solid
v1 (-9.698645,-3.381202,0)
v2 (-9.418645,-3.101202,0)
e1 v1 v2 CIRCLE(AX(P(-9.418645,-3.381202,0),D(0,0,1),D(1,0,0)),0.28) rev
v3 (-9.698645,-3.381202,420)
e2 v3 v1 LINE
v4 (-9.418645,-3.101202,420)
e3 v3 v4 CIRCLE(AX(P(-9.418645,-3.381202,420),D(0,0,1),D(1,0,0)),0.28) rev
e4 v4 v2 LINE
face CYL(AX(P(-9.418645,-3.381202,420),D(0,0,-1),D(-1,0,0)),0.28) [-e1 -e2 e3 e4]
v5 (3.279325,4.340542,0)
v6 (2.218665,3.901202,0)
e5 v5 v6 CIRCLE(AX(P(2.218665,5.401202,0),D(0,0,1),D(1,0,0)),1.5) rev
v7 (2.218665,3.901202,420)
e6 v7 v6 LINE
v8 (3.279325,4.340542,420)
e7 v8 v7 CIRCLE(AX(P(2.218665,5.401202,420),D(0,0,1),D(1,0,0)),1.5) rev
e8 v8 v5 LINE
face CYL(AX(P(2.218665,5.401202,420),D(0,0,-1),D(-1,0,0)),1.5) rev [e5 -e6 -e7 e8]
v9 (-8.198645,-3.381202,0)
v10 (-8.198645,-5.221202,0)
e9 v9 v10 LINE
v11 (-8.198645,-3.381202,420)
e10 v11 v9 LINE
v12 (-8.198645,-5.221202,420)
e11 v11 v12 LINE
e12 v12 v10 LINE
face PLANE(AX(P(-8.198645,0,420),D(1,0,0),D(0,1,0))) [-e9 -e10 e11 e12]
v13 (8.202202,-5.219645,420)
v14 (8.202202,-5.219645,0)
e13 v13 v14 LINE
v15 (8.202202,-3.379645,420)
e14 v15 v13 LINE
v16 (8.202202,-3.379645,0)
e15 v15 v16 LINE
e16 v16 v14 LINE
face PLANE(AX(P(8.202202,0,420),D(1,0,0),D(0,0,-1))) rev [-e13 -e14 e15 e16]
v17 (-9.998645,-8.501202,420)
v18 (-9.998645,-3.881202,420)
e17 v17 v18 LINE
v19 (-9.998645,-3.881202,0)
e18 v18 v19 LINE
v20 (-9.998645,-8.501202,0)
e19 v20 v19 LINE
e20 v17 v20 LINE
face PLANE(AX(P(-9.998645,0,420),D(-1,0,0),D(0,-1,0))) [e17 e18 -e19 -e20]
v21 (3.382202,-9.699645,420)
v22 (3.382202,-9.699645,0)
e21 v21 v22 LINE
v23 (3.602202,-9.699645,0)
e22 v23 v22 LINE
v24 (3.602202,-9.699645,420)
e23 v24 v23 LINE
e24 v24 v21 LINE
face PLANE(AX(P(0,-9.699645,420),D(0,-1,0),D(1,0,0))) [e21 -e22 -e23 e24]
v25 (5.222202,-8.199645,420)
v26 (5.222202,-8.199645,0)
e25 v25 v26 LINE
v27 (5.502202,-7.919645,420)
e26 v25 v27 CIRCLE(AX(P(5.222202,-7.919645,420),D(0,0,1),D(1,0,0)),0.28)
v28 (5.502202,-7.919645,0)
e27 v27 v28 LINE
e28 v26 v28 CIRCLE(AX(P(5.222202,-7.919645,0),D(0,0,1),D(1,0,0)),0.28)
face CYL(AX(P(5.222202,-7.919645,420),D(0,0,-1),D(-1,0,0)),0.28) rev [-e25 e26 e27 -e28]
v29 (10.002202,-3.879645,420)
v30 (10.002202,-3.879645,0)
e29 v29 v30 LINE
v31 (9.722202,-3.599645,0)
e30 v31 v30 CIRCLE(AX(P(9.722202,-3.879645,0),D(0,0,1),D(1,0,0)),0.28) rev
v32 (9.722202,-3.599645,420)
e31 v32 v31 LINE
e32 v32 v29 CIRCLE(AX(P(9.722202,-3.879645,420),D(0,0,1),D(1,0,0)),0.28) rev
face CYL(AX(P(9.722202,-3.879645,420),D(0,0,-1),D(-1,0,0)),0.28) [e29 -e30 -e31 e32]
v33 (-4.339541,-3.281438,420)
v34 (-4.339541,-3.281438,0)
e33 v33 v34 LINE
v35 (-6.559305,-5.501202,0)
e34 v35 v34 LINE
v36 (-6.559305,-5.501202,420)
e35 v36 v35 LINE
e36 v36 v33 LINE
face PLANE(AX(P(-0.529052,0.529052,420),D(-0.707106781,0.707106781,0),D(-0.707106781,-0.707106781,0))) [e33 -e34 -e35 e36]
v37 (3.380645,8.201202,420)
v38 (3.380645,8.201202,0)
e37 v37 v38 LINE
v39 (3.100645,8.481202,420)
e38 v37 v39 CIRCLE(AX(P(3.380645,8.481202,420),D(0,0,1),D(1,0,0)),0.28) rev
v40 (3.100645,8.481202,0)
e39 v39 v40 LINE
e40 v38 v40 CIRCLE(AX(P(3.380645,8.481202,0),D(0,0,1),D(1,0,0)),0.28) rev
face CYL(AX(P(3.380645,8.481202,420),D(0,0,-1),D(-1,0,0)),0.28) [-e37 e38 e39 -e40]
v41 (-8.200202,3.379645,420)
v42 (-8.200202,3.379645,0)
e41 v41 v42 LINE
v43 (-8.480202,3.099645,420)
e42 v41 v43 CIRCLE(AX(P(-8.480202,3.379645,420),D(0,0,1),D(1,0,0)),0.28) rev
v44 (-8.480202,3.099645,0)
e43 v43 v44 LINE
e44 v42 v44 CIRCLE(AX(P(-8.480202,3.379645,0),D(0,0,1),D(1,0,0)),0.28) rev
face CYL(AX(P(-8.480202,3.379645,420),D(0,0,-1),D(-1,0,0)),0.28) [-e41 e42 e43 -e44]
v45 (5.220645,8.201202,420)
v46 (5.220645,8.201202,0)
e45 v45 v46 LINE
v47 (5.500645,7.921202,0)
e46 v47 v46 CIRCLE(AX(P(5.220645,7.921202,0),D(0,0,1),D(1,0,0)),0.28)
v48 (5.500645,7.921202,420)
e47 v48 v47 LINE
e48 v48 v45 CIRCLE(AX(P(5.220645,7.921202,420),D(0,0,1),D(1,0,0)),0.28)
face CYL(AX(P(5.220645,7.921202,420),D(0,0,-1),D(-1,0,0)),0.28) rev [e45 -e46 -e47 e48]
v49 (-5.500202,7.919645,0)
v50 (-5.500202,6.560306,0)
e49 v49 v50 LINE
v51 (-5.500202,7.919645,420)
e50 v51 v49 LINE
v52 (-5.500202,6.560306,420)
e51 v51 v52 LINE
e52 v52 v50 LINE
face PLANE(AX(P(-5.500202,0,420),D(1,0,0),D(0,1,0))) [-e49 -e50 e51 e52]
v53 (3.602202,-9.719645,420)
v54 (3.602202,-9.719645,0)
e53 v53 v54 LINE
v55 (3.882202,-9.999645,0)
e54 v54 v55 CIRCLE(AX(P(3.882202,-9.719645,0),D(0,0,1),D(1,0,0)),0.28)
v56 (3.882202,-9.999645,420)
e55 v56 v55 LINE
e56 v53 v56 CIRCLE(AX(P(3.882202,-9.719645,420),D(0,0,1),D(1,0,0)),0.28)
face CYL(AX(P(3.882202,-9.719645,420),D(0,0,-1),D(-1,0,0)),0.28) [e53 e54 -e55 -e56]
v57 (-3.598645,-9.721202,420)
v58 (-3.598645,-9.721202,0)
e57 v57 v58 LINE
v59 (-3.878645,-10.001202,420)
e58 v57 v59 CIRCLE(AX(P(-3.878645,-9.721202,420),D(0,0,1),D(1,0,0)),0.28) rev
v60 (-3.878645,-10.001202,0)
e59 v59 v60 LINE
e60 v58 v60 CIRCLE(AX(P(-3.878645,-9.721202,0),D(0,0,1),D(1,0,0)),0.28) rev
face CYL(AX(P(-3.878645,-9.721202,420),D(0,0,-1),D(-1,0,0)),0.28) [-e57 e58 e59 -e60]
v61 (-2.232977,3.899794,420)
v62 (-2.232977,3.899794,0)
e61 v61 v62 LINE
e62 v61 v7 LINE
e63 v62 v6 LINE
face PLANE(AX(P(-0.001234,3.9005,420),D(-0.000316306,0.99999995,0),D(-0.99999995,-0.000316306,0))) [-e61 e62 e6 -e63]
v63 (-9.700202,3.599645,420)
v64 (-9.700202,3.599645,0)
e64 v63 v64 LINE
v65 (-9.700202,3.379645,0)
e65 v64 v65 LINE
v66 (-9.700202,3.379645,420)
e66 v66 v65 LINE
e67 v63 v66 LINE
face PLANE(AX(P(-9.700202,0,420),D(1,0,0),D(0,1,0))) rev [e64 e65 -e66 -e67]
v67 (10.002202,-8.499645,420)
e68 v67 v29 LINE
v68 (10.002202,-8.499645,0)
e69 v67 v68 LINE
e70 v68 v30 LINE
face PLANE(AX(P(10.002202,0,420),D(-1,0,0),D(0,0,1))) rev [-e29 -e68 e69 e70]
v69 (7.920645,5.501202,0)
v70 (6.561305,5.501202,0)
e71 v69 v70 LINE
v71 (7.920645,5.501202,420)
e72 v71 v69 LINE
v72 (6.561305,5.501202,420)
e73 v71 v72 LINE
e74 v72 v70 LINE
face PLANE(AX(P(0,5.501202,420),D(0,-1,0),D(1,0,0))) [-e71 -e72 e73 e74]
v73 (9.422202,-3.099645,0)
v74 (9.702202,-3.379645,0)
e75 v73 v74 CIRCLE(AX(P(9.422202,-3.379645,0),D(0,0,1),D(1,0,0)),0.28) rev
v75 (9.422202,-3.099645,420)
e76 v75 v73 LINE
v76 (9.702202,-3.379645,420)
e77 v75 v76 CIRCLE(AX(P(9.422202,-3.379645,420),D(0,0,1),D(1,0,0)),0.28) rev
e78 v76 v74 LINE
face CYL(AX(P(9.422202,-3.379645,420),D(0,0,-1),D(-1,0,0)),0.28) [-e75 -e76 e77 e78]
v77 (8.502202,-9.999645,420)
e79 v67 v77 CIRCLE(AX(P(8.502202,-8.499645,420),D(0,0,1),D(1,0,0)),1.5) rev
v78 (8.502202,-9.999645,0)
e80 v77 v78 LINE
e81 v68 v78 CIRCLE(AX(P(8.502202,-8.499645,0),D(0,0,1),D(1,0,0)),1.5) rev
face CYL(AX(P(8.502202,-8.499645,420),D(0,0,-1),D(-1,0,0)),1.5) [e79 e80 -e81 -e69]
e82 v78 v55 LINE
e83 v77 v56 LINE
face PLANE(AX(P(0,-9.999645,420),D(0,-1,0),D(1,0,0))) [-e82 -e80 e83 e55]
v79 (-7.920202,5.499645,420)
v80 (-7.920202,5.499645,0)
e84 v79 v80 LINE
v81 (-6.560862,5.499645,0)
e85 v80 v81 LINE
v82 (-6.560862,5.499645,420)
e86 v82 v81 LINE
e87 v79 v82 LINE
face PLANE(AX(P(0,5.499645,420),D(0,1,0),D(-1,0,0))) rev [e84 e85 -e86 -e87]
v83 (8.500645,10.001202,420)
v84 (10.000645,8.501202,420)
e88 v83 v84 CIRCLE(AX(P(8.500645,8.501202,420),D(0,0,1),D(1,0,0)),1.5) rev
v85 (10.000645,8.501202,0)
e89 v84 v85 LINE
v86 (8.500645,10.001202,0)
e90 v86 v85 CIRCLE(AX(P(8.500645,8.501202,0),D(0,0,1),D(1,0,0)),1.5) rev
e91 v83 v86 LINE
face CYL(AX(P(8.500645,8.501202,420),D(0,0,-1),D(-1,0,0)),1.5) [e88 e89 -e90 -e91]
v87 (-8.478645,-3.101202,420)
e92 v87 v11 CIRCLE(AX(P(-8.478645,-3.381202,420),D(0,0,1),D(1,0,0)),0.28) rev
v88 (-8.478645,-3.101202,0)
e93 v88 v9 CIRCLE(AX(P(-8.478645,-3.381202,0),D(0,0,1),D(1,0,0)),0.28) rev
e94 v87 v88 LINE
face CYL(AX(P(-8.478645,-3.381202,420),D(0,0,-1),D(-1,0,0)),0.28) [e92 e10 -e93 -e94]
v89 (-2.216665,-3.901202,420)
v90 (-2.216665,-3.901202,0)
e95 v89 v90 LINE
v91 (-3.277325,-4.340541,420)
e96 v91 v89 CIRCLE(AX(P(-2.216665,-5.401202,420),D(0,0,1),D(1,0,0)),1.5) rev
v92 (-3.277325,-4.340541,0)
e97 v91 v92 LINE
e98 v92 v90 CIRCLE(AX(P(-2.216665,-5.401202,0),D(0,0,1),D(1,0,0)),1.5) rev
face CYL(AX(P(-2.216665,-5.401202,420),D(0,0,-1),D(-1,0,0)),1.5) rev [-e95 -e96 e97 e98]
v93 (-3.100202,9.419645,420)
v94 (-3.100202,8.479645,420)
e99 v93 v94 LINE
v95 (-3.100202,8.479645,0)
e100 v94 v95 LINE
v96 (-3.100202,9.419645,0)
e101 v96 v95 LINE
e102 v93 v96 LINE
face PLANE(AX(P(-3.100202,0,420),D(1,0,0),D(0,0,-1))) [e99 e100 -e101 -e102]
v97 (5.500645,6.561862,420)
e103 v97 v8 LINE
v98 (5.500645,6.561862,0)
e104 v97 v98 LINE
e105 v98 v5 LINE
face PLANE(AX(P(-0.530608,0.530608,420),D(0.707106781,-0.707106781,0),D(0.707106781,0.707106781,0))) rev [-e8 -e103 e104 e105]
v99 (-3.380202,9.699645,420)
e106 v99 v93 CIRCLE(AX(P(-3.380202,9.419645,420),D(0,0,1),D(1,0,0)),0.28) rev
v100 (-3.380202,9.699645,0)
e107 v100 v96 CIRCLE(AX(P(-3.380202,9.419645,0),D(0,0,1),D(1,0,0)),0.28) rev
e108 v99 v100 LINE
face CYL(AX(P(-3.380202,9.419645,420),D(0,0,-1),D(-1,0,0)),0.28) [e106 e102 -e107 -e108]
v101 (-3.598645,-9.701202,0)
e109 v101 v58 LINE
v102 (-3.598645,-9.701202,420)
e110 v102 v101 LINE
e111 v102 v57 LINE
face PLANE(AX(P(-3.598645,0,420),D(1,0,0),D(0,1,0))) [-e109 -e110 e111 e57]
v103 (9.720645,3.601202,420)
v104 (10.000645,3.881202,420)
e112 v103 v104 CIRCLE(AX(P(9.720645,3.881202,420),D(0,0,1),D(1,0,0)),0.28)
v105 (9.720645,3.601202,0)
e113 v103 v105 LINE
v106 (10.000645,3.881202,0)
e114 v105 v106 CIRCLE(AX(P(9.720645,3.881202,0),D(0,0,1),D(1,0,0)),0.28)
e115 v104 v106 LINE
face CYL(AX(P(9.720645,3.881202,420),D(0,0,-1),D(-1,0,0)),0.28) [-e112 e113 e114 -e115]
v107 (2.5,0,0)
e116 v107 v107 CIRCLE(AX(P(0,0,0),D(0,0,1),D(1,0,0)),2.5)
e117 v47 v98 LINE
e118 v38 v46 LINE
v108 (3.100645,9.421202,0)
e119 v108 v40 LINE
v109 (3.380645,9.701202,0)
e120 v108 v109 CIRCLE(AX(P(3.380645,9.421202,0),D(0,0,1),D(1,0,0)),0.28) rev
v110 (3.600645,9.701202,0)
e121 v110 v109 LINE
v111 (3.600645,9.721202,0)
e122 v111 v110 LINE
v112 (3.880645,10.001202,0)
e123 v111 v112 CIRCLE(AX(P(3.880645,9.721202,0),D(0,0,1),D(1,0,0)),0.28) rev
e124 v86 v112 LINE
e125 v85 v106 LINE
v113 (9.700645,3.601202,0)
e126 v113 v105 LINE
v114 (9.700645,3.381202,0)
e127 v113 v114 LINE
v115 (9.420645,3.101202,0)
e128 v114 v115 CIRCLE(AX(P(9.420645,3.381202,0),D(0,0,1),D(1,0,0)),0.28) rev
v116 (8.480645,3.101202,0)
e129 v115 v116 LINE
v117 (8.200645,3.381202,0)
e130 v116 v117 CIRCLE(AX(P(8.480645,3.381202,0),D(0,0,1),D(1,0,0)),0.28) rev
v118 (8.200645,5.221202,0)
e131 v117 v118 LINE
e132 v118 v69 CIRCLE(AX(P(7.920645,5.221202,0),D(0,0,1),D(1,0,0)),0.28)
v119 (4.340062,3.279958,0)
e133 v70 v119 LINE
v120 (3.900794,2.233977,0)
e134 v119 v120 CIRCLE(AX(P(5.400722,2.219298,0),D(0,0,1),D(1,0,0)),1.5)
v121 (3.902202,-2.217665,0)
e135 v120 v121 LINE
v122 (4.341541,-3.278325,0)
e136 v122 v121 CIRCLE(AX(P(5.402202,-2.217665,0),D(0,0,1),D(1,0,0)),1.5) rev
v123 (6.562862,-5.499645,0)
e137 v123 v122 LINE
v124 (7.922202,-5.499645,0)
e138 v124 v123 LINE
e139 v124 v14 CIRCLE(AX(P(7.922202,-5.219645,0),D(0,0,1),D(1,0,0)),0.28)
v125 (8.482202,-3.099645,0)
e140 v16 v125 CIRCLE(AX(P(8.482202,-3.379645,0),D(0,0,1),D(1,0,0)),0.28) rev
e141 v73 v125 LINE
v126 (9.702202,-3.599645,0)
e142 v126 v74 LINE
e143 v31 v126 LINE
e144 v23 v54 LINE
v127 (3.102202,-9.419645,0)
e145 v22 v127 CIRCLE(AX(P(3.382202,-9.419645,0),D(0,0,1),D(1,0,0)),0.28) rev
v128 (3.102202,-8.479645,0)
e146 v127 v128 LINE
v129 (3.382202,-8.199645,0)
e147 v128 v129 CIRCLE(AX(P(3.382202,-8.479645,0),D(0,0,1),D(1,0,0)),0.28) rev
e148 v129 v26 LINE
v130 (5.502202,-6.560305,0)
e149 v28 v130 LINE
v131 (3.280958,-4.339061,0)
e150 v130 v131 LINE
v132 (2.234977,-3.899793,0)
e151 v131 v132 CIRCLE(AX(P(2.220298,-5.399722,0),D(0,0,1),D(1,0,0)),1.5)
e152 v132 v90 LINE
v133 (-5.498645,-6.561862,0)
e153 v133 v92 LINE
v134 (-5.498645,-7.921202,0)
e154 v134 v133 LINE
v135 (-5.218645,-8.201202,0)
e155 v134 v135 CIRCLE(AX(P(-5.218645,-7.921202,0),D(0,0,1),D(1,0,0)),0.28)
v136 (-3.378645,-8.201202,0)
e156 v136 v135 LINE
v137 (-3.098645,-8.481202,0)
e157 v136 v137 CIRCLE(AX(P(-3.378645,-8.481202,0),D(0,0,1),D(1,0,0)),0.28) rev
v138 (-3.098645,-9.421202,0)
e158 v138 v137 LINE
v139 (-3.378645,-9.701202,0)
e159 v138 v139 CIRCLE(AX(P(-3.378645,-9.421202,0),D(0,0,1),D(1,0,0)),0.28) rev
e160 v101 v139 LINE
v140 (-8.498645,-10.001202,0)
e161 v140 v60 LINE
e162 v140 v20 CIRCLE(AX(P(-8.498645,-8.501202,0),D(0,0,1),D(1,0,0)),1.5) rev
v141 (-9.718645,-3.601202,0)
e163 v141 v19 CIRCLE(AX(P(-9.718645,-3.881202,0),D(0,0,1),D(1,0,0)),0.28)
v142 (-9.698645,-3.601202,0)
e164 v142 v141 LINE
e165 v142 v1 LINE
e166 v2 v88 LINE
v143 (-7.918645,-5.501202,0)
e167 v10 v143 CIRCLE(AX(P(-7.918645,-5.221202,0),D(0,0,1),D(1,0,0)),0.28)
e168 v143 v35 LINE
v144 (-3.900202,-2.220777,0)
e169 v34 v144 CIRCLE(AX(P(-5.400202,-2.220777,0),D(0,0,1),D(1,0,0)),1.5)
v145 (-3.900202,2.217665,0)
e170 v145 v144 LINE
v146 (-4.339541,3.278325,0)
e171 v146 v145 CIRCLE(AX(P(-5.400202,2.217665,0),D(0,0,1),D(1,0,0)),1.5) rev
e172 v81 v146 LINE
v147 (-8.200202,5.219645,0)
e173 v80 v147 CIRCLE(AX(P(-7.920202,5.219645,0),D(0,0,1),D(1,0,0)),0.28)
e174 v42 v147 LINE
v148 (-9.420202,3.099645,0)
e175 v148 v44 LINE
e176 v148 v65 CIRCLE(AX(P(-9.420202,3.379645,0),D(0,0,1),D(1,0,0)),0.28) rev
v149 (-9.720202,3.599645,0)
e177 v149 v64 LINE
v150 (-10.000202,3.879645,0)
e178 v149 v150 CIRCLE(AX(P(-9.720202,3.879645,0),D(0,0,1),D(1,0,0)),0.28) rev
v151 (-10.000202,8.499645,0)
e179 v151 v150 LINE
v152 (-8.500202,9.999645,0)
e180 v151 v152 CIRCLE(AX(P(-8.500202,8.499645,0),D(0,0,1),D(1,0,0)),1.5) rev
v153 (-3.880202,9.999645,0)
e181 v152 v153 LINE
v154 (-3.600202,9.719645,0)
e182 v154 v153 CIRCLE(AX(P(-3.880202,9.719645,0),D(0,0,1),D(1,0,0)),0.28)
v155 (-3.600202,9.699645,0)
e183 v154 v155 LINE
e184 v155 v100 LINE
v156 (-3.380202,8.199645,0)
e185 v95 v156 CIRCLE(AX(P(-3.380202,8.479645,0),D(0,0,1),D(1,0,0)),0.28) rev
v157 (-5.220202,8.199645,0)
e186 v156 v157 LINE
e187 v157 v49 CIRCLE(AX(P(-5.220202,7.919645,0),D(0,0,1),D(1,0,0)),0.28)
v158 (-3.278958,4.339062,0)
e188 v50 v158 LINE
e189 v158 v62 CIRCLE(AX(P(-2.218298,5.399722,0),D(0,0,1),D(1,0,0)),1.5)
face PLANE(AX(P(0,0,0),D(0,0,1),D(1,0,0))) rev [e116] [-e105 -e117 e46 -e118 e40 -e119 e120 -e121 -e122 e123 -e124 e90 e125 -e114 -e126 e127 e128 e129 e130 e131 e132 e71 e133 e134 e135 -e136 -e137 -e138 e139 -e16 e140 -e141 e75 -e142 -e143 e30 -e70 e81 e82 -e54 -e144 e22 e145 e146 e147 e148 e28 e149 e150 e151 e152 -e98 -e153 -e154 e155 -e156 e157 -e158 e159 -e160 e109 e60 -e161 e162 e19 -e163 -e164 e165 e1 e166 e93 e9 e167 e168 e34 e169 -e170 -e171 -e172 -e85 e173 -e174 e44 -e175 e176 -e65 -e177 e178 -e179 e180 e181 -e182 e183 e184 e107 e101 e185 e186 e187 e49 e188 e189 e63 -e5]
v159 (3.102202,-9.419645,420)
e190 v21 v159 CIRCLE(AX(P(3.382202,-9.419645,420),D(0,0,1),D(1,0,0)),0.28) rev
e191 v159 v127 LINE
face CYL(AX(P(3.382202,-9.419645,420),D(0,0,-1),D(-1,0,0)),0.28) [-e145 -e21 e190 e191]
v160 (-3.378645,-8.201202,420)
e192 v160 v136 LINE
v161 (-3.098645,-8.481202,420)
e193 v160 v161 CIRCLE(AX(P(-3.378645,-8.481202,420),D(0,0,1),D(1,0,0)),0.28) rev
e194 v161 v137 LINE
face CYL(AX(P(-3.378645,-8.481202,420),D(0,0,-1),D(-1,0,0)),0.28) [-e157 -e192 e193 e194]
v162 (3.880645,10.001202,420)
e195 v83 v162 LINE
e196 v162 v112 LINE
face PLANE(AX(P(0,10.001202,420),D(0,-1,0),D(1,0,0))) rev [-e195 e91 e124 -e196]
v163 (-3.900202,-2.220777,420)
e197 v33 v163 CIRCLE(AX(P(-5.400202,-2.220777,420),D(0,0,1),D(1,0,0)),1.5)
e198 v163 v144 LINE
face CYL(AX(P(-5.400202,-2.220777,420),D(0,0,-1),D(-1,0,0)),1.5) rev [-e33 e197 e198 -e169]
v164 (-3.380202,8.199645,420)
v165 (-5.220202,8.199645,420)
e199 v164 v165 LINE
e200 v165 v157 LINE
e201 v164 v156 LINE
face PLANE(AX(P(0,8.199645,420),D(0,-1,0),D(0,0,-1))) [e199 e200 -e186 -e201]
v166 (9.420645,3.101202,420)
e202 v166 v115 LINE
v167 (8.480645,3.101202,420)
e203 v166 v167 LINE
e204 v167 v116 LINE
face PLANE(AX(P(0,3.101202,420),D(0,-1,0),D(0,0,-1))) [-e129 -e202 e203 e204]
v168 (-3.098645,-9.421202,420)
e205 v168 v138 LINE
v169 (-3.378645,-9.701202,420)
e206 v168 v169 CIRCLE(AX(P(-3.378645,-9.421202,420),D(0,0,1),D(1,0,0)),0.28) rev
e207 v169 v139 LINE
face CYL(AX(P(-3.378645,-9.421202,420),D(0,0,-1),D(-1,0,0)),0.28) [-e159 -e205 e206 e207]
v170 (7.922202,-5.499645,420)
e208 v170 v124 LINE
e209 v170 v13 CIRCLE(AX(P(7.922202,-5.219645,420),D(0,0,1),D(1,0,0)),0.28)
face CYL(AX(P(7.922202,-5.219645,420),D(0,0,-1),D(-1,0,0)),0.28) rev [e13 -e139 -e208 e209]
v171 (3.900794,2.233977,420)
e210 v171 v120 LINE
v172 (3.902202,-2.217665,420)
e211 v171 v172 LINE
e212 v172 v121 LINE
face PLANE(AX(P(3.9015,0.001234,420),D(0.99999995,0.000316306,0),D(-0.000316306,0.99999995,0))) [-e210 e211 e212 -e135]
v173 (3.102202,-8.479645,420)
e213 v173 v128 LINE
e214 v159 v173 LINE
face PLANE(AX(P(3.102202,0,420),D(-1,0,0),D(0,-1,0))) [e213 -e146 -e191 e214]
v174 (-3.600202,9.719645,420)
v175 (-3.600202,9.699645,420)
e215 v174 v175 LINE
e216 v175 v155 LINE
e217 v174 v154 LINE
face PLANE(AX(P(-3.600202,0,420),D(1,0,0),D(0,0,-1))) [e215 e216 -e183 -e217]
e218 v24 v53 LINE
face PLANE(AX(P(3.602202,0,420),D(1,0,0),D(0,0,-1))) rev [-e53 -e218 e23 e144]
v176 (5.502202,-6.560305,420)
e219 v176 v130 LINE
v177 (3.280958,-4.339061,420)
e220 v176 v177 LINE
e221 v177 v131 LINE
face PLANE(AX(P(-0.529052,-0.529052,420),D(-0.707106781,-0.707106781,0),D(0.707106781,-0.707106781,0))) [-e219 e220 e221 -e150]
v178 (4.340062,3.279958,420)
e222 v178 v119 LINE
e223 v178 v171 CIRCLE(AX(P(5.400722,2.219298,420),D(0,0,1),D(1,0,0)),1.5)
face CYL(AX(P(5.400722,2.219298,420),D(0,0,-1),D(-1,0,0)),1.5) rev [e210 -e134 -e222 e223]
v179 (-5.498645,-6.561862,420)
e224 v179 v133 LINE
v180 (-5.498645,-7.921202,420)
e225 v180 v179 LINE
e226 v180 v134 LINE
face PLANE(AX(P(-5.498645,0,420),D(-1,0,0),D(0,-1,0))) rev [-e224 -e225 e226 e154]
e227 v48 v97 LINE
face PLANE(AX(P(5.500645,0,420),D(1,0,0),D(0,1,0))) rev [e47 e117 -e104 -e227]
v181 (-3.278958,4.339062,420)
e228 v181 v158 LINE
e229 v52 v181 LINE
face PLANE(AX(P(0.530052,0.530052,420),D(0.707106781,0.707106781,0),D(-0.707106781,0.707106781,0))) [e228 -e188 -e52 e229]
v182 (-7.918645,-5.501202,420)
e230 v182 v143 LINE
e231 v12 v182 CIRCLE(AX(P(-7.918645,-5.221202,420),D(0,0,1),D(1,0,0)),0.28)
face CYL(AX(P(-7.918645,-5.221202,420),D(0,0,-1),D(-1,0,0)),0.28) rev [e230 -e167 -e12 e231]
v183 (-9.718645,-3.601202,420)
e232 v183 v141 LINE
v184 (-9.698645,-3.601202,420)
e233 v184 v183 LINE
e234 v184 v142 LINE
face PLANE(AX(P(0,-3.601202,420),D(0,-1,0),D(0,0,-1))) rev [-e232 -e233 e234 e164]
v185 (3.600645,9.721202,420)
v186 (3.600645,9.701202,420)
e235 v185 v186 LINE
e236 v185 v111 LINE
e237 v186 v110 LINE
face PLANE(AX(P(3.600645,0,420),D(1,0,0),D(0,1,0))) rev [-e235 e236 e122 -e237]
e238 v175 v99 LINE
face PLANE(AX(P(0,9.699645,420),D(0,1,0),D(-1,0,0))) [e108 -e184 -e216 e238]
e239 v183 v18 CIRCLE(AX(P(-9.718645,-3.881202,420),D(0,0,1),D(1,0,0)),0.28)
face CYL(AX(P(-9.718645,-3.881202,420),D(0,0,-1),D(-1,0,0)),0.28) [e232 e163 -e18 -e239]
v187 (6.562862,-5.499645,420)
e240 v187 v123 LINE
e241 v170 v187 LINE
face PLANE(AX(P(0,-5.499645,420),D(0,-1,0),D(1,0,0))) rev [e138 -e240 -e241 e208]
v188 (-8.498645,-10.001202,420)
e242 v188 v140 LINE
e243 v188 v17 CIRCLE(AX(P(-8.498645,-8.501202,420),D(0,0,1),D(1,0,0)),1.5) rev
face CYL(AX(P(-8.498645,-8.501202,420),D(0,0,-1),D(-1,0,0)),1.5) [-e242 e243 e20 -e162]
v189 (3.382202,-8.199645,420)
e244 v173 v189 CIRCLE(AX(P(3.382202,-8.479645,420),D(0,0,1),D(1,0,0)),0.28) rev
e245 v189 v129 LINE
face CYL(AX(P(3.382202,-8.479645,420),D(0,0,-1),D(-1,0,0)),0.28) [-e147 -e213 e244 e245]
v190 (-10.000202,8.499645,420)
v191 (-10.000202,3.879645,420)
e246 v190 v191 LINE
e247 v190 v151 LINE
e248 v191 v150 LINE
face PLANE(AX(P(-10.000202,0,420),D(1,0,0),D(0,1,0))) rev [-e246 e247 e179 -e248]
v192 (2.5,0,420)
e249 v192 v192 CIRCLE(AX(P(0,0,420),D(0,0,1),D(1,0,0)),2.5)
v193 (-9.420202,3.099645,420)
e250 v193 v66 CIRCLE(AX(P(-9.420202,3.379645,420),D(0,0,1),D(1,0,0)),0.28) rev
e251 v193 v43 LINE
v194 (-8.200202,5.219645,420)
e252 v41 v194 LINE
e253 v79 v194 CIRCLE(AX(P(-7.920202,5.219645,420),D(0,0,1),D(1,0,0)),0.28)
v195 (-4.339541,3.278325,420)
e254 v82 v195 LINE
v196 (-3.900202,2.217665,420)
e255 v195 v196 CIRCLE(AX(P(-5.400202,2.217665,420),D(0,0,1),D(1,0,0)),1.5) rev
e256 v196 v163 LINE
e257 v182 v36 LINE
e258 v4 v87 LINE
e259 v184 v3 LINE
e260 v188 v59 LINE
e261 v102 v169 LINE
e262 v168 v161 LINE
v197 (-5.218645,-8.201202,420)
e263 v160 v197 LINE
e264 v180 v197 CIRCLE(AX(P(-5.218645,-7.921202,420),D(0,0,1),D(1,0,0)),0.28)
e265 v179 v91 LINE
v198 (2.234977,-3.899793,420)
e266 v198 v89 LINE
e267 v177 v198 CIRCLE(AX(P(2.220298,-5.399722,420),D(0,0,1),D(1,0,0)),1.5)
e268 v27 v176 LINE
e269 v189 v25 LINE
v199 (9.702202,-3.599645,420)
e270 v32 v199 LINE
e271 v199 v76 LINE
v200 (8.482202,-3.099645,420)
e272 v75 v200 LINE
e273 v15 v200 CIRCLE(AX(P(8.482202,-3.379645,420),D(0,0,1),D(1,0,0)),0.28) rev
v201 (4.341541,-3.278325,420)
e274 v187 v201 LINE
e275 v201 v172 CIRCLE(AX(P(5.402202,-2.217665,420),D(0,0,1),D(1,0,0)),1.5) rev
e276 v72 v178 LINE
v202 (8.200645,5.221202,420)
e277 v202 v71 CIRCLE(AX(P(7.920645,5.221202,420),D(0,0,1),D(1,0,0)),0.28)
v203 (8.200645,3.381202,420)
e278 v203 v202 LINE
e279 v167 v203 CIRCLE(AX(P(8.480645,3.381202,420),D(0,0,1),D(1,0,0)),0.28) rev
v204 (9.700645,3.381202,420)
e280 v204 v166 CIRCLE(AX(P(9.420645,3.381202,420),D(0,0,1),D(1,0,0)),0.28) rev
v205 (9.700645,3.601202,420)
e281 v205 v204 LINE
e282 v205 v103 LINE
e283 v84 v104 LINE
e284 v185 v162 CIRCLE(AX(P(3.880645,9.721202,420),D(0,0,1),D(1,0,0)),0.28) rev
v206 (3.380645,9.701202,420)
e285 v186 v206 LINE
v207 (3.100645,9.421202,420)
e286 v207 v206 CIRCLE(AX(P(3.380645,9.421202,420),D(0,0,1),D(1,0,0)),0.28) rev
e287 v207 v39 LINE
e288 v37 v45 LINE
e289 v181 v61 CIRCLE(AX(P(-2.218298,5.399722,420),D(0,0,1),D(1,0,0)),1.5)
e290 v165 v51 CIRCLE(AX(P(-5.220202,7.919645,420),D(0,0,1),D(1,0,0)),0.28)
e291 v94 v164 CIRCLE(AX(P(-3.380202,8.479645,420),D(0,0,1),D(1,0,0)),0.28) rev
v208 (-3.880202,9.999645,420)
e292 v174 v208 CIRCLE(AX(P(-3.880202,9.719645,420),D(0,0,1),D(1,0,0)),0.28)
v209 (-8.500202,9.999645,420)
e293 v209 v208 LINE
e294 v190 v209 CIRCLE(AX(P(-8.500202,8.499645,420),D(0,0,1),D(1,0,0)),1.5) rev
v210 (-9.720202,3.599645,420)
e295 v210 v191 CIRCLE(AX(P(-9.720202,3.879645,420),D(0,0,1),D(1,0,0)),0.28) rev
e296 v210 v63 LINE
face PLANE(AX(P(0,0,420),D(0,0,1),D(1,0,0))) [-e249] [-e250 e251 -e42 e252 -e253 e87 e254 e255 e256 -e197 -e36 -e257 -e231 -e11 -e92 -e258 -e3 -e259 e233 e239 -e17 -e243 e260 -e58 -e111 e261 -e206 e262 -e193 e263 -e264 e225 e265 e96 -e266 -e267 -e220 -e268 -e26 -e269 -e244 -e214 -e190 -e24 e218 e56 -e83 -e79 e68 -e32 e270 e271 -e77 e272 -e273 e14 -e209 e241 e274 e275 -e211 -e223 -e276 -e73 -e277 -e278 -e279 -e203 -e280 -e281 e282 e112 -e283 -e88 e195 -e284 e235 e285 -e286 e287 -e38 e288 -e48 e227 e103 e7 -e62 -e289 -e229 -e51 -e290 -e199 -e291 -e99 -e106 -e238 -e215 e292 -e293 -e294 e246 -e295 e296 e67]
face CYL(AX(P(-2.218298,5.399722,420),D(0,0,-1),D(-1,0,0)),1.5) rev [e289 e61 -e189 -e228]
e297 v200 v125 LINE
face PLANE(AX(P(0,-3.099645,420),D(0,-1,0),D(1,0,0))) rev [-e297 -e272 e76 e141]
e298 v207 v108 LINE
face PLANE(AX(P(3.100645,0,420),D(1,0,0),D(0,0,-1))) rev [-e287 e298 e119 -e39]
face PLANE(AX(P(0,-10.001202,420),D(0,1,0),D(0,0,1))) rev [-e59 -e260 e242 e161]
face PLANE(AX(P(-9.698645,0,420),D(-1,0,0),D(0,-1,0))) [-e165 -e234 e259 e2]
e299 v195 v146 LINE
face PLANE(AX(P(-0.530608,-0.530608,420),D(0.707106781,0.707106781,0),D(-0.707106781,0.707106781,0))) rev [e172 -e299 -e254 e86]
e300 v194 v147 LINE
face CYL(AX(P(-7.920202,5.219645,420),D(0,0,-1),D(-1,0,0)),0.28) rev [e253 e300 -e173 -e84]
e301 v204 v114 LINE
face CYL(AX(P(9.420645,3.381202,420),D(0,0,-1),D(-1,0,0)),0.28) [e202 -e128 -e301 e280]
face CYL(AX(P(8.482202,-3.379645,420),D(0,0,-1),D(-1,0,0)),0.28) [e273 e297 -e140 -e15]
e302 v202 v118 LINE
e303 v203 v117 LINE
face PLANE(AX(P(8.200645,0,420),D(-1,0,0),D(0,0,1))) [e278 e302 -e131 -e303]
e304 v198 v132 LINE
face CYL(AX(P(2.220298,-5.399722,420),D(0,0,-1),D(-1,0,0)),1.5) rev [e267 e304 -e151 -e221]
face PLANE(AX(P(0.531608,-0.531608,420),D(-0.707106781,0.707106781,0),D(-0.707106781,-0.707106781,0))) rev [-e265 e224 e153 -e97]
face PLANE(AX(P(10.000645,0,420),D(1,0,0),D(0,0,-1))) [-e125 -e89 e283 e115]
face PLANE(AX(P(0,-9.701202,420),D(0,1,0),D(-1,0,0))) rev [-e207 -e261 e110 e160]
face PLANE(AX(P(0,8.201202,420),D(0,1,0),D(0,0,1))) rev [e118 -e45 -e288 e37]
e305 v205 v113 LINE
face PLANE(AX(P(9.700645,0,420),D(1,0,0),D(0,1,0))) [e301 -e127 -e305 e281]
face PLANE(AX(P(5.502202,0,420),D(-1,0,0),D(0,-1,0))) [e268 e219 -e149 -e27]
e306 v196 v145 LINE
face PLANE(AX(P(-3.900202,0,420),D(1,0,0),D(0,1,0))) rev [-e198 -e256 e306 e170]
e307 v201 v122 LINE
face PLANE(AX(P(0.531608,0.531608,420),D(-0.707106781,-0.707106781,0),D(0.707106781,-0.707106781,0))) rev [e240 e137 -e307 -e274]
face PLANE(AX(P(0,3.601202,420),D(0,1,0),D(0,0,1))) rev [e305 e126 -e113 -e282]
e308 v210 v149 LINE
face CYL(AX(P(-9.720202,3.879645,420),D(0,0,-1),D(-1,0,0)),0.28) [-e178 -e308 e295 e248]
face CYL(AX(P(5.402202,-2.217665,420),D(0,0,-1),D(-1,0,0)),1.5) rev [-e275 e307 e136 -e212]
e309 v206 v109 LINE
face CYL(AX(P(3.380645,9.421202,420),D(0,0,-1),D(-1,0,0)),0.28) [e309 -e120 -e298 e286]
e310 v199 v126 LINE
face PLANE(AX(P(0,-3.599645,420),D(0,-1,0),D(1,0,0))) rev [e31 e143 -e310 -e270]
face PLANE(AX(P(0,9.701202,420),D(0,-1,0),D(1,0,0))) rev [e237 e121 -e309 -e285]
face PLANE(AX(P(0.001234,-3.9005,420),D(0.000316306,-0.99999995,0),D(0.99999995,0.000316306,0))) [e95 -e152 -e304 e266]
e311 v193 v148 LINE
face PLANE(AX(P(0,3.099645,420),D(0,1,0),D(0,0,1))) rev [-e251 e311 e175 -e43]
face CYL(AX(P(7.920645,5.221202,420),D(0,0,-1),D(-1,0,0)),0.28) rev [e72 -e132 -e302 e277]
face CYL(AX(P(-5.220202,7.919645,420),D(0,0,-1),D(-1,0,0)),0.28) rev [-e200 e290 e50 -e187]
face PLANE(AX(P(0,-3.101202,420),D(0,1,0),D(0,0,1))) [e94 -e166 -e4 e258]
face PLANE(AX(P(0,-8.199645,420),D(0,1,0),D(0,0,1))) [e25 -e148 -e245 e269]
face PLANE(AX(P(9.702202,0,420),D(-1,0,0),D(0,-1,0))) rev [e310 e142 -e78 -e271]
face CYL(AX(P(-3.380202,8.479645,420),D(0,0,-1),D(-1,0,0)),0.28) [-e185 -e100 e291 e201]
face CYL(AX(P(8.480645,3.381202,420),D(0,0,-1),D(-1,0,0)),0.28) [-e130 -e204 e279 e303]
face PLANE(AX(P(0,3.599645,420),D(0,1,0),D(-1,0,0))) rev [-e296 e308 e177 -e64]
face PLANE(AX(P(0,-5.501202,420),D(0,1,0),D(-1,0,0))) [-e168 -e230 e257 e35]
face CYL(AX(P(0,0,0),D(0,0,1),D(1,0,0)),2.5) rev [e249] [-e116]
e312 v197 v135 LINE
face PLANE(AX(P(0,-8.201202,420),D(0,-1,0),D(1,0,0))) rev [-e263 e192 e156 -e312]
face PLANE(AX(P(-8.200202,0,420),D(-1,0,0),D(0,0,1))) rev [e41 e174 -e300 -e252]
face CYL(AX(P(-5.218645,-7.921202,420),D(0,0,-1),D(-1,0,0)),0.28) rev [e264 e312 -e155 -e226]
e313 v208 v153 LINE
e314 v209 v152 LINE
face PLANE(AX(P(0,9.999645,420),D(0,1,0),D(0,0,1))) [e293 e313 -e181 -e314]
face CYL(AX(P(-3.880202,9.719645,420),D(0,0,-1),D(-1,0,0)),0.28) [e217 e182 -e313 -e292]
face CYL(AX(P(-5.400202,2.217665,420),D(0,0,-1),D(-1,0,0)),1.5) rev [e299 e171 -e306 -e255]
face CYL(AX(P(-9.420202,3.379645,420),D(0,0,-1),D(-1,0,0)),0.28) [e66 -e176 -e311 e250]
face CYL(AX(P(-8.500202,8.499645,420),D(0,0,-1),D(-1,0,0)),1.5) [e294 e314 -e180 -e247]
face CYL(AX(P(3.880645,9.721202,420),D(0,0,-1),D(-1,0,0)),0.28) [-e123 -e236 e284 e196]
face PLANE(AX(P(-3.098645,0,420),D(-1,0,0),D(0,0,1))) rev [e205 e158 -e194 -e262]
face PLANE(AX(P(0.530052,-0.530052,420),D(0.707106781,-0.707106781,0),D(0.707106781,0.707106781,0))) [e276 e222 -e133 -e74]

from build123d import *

# Parameters (mm, degrees)
BOSS_EXTRUDE1_DEPTH = 420
F_3DSKETCH2_R       = 2.5
CUT_EXTRUDE1_DEPTH  = 421.238108785


with BuildPart() as part:
    # Sketch1 → Boss-Extrude1 (new body)
    with BuildSketch(Plane.XY):
        with BuildLine():
            ThreePointArc((-4.339541497, 3.27832502), (-4.01438237, 2.791689997), (-3.900201668, 2.217664848))
            Line((-3.900201668, 2.217664848), (-3.900201668, -2.220777458))
            ThreePointArc((-3.900201668, -2.220777458), (-4.013982246, -2.793835668), (-4.338062619, -3.279956687))
            ThreePointArc((-4.338062619, -3.279956687), (-4.338801799, -3.280697416), (-4.339541497, -3.28143763))
            Line((-4.339541497, -3.28143763), (-6.559305445, -5.501201578))
            Line((-6.559305445, -5.501201578), (-7.918645273, -5.501201578))
            ThreePointArc((-7.918645273, -5.501201578), (-8.116635172, -5.419191476), (-8.198645273, -5.221201578))
            Line((-8.198645273, -5.221201578), (-8.198645273, -3.381201578))
            ThreePointArc((-8.198645273, -3.381201578), (-8.280655374, -3.183211679), (-8.478645273, -3.101201578))
            Line((-8.478645273, -3.101201578), (-9.418645273, -3.101201578))
            ThreePointArc((-9.418645273, -3.101201578), (-9.616635172, -3.183211679), (-9.698645273, -3.381201578))
            Line((-9.698645273, -3.381201578), (-9.698645273, -3.601201578))
            Line((-9.698645273, -3.601201578), (-9.718645273, -3.601201578))
            ThreePointArc((-9.718645273, -3.601201578), (-9.916635172, -3.683211679), (-9.998645273, -3.881201578))
            Line((-9.998645273, -3.881201578), (-9.998645273, -8.501201578))
            ThreePointArc((-9.998645273, -8.501201578), (-9.559305445, -9.561861749), (-8.498645273, -10.001201578))
            Line((-8.498645273, -10.001201578), (-3.878645273, -10.001201578))
            ThreePointArc((-3.878645273, -10.001201578), (-3.680655374, -9.919191476), (-3.598645273, -9.721201578))
            Line((-3.598645273, -9.721201578), (-3.598645273, -9.701201578))
            Line((-3.598645273, -9.701201578), (-3.378645273, -9.701201578))
            ThreePointArc((-3.378645273, -9.701201578), (-3.180655374, -9.619191476), (-3.098645273, -9.421201578))
            Line((-3.098645273, -9.421201578), (-3.098645273, -8.481201578))
            ThreePointArc((-3.098645273, -8.481201578), (-3.180655374, -8.283211679), (-3.378645273, -8.201201578))
            Line((-3.378645273, -8.201201578), (-5.218645273, -8.201201578))
            ThreePointArc((-5.218645273, -8.201201578), (-5.416635172, -8.119191476), (-5.498645273, -7.921201578))
            Line((-5.498645273, -7.921201578), (-5.498645273, -6.561861749))
            Line((-5.498645273, -6.561861749), (-3.277324929, -4.340541406))
            ThreePointArc((-3.277324929, -4.340541406), (-2.790689906, -4.015382279), (-2.216664757, -3.901201578))
            Line((-2.216664757, -3.901201578), (2.234977304, -3.899793498))
            ThreePointArc((2.234977304, -3.899793498), (2.801097117, -4.016727825), (3.280957809, -4.339061494))
            Line((3.280957809, -4.339061494), (5.502201668, -6.560305354))
            Line((5.502201668, -6.560305354), (5.502201668, -7.919645182))
            ThreePointArc((5.502201668, -7.919645182), (5.420191567, -8.117635081), (5.222201668, -8.199645182))
            Line((5.222201668, -8.199645182), (3.382201668, -8.199645182))
            ThreePointArc((3.382201668, -8.199645182), (3.18421177, -8.281655283), (3.102201668, -8.479645182))
            Line((3.102201668, -8.479645182), (3.102201668, -9.419645182))
            ThreePointArc((3.102201668, -9.419645182), (3.18421177, -9.617635081), (3.382201668, -9.699645182))
            Line((3.382201668, -9.699645182), (3.602201668, -9.699645182))
            Line((3.602201668, -9.699645182), (3.602201668, -9.719645182))
            ThreePointArc((3.602201668, -9.719645182), (3.68421177, -9.917635081), (3.882201668, -9.999645182))
            Line((3.882201668, -9.999645182), (8.502201668, -9.999645182))
            ThreePointArc((8.502201668, -9.999645182), (9.56286184, -9.560305354), (10.002201668, -8.499645182))
            Line((10.002201668, -8.499645182), (10.002201668, -3.879645182))
            ThreePointArc((10.002201668, -3.879645182), (9.920191567, -3.681655283), (9.722201668, -3.599645182))
            Line((9.722201668, -3.599645182), (9.702201668, -3.599645182))
            Line((9.702201668, -3.599645182), (9.702201668, -3.379645182))
            ThreePointArc((9.702201668, -3.379645182), (9.620191567, -3.181655283), (9.422201668, -3.099645182))
            Line((9.422201668, -3.099645182), (8.482201668, -3.099645182))
            ThreePointArc((8.482201668, -3.099645182), (8.28421177, -3.181655283), (8.202201668, -3.379645182))
            Line((8.202201668, -3.379645182), (8.202201668, -5.219645182))
            ThreePointArc((8.202201668, -5.219645182), (8.120191567, -5.417635081), (7.922201668, -5.499645182))
            Line((7.922201668, -5.499645182), (6.56286184, -5.499645182))
            Line((6.56286184, -5.499645182), (4.341541497, -3.278324838))
            ThreePointArc((4.341541497, -3.278324838), (4.01638237, -2.791689815), (3.902201668, -2.217664667))
            Line((3.902201668, -2.217664667), (3.900793589, 2.233977395))
            ThreePointArc((3.900793589, 2.233977395), (4.017727916, 2.800097207), (4.340061585, 3.2799579))
            Line((4.340061585, 3.2799579), (6.561305445, 5.501201759))
            Line((6.561305445, 5.501201759), (7.920645273, 5.501201759))
            ThreePointArc((7.920645273, 5.501201759), (8.118635172, 5.419191658), (8.200645273, 5.221201759))
            Line((8.200645273, 5.221201759), (8.200645273, 3.381201759))
            ThreePointArc((8.200645273, 3.381201759), (8.282655374, 3.183211861), (8.480645273, 3.101201759))
            Line((8.480645273, 3.101201759), (9.420645273, 3.101201759))
            ThreePointArc((9.420645273, 3.101201759), (9.618635172, 3.183211861), (9.700645273, 3.381201759))
            Line((9.700645273, 3.381201759), (9.700645273, 3.601201759))
            Line((9.700645273, 3.601201759), (9.720645273, 3.601201759))
            ThreePointArc((9.720645273, 3.601201759), (9.918635172, 3.683211861), (10.000645273, 3.881201759))
            Line((10.000645273, 3.881201759), (10.000645273, 8.501201759))
            ThreePointArc((10.000645273, 8.501201759), (9.561305445, 9.561861931), (8.500645273, 10.001201759))
            Line((8.500645273, 10.001201759), (3.880645273, 10.001201759))
            ThreePointArc((3.880645273, 10.001201759), (3.682655374, 9.919191658), (3.600645273, 9.721201759))
            Line((3.600645273, 9.721201759), (3.600645273, 9.701201759))
            Line((3.600645273, 9.701201759), (3.380645273, 9.701201759))
            ThreePointArc((3.380645273, 9.701201759), (3.182655374, 9.619191658), (3.100645273, 9.421201759))
            Line((3.100645273, 9.421201759), (3.100645273, 8.481201759))
            ThreePointArc((3.100645273, 8.481201759), (3.182655374, 8.283211861), (3.380645273, 8.201201759))
            Line((3.380645273, 8.201201759), (5.220645273, 8.201201759))
            ThreePointArc((5.220645273, 8.201201759), (5.418635172, 8.119191658), (5.500645273, 7.921201759))
            Line((5.500645273, 7.921201759), (5.500645273, 6.561861931))
            Line((5.500645273, 6.561861931), (3.279324929, 4.340541588))
            ThreePointArc((3.279324929, 4.340541588), (2.792689906, 4.015382461), (2.218664757, 3.901201759))
            Line((2.218664757, 3.901201759), (-2.232977304, 3.89979368))
            ThreePointArc((-2.232977304, 3.89979368), (-2.799097117, 4.016728006), (-3.278957809, 4.339061676))
            Line((-3.278957809, 4.339061676), (-5.500201668, 6.560305535))
            Line((-5.500201668, 6.560305535), (-5.500201668, 7.919645364))
            ThreePointArc((-5.500201668, 7.919645364), (-5.418191567, 8.117635262), (-5.220201668, 8.199645364))
            Line((-5.220201668, 8.199645364), (-3.380201668, 8.199645364))
            ThreePointArc((-3.380201668, 8.199645364), (-3.18221177, 8.281655465), (-3.100201668, 8.479645364))
            Line((-3.100201668, 8.479645364), (-3.100201668, 9.419645364))
            ThreePointArc((-3.100201668, 9.419645364), (-3.18221177, 9.617635262), (-3.380201668, 9.699645364))
            Line((-3.380201668, 9.699645364), (-3.600201668, 9.699645364))
            Line((-3.600201668, 9.699645364), (-3.600201668, 9.719645364))
            ThreePointArc((-3.600201668, 9.719645364), (-3.68221177, 9.917635262), (-3.880201668, 9.999645364))
            Line((-3.880201668, 9.999645364), (-8.500201668, 9.999645364))
            ThreePointArc((-8.500201668, 9.999645364), (-9.56086184, 9.560305535), (-10.000201668, 8.499645364))
            Line((-10.000201668, 8.499645364), (-10.000201668, 3.879645364))
            ThreePointArc((-10.000201668, 3.879645364), (-9.918191567, 3.681655465), (-9.720201668, 3.599645364))
            Line((-9.720201668, 3.599645364), (-9.700201668, 3.599645364))
            Line((-9.700201668, 3.599645364), (-9.700201668, 3.379645364))
            ThreePointArc((-9.700201668, 3.379645364), (-9.618191567, 3.181655465), (-9.420201668, 3.099645364))
            Line((-9.420201668, 3.099645364), (-8.480201668, 3.099645364))
            ThreePointArc((-8.480201668, 3.099645364), (-8.28221177, 3.181655465), (-8.200201668, 3.379645364))
            Line((-8.200201668, 3.379645364), (-8.200201668, 5.219645364))
            ThreePointArc((-8.200201668, 5.219645364), (-8.118191567, 5.417635262), (-7.920201668, 5.499645364))
            Line((-7.920201668, 5.499645364), (-6.56086184, 5.499645364))
            Line((-6.56086184, 5.499645364), (-4.339541497, 3.27832502))
        make_face()
    extrude(amount=BOSS_EXTRUDE1_DEPTH)

    # 3DSketch2 → Cut-Extrude1 (cut, through all)
    with BuildSketch(Plane.XY):
        Circle(F_3DSKETCH2_R)
    extrude(amount=CUT_EXTRUDE1_DEPTH, mode=Mode.SUBTRACT)


solid = part.part
